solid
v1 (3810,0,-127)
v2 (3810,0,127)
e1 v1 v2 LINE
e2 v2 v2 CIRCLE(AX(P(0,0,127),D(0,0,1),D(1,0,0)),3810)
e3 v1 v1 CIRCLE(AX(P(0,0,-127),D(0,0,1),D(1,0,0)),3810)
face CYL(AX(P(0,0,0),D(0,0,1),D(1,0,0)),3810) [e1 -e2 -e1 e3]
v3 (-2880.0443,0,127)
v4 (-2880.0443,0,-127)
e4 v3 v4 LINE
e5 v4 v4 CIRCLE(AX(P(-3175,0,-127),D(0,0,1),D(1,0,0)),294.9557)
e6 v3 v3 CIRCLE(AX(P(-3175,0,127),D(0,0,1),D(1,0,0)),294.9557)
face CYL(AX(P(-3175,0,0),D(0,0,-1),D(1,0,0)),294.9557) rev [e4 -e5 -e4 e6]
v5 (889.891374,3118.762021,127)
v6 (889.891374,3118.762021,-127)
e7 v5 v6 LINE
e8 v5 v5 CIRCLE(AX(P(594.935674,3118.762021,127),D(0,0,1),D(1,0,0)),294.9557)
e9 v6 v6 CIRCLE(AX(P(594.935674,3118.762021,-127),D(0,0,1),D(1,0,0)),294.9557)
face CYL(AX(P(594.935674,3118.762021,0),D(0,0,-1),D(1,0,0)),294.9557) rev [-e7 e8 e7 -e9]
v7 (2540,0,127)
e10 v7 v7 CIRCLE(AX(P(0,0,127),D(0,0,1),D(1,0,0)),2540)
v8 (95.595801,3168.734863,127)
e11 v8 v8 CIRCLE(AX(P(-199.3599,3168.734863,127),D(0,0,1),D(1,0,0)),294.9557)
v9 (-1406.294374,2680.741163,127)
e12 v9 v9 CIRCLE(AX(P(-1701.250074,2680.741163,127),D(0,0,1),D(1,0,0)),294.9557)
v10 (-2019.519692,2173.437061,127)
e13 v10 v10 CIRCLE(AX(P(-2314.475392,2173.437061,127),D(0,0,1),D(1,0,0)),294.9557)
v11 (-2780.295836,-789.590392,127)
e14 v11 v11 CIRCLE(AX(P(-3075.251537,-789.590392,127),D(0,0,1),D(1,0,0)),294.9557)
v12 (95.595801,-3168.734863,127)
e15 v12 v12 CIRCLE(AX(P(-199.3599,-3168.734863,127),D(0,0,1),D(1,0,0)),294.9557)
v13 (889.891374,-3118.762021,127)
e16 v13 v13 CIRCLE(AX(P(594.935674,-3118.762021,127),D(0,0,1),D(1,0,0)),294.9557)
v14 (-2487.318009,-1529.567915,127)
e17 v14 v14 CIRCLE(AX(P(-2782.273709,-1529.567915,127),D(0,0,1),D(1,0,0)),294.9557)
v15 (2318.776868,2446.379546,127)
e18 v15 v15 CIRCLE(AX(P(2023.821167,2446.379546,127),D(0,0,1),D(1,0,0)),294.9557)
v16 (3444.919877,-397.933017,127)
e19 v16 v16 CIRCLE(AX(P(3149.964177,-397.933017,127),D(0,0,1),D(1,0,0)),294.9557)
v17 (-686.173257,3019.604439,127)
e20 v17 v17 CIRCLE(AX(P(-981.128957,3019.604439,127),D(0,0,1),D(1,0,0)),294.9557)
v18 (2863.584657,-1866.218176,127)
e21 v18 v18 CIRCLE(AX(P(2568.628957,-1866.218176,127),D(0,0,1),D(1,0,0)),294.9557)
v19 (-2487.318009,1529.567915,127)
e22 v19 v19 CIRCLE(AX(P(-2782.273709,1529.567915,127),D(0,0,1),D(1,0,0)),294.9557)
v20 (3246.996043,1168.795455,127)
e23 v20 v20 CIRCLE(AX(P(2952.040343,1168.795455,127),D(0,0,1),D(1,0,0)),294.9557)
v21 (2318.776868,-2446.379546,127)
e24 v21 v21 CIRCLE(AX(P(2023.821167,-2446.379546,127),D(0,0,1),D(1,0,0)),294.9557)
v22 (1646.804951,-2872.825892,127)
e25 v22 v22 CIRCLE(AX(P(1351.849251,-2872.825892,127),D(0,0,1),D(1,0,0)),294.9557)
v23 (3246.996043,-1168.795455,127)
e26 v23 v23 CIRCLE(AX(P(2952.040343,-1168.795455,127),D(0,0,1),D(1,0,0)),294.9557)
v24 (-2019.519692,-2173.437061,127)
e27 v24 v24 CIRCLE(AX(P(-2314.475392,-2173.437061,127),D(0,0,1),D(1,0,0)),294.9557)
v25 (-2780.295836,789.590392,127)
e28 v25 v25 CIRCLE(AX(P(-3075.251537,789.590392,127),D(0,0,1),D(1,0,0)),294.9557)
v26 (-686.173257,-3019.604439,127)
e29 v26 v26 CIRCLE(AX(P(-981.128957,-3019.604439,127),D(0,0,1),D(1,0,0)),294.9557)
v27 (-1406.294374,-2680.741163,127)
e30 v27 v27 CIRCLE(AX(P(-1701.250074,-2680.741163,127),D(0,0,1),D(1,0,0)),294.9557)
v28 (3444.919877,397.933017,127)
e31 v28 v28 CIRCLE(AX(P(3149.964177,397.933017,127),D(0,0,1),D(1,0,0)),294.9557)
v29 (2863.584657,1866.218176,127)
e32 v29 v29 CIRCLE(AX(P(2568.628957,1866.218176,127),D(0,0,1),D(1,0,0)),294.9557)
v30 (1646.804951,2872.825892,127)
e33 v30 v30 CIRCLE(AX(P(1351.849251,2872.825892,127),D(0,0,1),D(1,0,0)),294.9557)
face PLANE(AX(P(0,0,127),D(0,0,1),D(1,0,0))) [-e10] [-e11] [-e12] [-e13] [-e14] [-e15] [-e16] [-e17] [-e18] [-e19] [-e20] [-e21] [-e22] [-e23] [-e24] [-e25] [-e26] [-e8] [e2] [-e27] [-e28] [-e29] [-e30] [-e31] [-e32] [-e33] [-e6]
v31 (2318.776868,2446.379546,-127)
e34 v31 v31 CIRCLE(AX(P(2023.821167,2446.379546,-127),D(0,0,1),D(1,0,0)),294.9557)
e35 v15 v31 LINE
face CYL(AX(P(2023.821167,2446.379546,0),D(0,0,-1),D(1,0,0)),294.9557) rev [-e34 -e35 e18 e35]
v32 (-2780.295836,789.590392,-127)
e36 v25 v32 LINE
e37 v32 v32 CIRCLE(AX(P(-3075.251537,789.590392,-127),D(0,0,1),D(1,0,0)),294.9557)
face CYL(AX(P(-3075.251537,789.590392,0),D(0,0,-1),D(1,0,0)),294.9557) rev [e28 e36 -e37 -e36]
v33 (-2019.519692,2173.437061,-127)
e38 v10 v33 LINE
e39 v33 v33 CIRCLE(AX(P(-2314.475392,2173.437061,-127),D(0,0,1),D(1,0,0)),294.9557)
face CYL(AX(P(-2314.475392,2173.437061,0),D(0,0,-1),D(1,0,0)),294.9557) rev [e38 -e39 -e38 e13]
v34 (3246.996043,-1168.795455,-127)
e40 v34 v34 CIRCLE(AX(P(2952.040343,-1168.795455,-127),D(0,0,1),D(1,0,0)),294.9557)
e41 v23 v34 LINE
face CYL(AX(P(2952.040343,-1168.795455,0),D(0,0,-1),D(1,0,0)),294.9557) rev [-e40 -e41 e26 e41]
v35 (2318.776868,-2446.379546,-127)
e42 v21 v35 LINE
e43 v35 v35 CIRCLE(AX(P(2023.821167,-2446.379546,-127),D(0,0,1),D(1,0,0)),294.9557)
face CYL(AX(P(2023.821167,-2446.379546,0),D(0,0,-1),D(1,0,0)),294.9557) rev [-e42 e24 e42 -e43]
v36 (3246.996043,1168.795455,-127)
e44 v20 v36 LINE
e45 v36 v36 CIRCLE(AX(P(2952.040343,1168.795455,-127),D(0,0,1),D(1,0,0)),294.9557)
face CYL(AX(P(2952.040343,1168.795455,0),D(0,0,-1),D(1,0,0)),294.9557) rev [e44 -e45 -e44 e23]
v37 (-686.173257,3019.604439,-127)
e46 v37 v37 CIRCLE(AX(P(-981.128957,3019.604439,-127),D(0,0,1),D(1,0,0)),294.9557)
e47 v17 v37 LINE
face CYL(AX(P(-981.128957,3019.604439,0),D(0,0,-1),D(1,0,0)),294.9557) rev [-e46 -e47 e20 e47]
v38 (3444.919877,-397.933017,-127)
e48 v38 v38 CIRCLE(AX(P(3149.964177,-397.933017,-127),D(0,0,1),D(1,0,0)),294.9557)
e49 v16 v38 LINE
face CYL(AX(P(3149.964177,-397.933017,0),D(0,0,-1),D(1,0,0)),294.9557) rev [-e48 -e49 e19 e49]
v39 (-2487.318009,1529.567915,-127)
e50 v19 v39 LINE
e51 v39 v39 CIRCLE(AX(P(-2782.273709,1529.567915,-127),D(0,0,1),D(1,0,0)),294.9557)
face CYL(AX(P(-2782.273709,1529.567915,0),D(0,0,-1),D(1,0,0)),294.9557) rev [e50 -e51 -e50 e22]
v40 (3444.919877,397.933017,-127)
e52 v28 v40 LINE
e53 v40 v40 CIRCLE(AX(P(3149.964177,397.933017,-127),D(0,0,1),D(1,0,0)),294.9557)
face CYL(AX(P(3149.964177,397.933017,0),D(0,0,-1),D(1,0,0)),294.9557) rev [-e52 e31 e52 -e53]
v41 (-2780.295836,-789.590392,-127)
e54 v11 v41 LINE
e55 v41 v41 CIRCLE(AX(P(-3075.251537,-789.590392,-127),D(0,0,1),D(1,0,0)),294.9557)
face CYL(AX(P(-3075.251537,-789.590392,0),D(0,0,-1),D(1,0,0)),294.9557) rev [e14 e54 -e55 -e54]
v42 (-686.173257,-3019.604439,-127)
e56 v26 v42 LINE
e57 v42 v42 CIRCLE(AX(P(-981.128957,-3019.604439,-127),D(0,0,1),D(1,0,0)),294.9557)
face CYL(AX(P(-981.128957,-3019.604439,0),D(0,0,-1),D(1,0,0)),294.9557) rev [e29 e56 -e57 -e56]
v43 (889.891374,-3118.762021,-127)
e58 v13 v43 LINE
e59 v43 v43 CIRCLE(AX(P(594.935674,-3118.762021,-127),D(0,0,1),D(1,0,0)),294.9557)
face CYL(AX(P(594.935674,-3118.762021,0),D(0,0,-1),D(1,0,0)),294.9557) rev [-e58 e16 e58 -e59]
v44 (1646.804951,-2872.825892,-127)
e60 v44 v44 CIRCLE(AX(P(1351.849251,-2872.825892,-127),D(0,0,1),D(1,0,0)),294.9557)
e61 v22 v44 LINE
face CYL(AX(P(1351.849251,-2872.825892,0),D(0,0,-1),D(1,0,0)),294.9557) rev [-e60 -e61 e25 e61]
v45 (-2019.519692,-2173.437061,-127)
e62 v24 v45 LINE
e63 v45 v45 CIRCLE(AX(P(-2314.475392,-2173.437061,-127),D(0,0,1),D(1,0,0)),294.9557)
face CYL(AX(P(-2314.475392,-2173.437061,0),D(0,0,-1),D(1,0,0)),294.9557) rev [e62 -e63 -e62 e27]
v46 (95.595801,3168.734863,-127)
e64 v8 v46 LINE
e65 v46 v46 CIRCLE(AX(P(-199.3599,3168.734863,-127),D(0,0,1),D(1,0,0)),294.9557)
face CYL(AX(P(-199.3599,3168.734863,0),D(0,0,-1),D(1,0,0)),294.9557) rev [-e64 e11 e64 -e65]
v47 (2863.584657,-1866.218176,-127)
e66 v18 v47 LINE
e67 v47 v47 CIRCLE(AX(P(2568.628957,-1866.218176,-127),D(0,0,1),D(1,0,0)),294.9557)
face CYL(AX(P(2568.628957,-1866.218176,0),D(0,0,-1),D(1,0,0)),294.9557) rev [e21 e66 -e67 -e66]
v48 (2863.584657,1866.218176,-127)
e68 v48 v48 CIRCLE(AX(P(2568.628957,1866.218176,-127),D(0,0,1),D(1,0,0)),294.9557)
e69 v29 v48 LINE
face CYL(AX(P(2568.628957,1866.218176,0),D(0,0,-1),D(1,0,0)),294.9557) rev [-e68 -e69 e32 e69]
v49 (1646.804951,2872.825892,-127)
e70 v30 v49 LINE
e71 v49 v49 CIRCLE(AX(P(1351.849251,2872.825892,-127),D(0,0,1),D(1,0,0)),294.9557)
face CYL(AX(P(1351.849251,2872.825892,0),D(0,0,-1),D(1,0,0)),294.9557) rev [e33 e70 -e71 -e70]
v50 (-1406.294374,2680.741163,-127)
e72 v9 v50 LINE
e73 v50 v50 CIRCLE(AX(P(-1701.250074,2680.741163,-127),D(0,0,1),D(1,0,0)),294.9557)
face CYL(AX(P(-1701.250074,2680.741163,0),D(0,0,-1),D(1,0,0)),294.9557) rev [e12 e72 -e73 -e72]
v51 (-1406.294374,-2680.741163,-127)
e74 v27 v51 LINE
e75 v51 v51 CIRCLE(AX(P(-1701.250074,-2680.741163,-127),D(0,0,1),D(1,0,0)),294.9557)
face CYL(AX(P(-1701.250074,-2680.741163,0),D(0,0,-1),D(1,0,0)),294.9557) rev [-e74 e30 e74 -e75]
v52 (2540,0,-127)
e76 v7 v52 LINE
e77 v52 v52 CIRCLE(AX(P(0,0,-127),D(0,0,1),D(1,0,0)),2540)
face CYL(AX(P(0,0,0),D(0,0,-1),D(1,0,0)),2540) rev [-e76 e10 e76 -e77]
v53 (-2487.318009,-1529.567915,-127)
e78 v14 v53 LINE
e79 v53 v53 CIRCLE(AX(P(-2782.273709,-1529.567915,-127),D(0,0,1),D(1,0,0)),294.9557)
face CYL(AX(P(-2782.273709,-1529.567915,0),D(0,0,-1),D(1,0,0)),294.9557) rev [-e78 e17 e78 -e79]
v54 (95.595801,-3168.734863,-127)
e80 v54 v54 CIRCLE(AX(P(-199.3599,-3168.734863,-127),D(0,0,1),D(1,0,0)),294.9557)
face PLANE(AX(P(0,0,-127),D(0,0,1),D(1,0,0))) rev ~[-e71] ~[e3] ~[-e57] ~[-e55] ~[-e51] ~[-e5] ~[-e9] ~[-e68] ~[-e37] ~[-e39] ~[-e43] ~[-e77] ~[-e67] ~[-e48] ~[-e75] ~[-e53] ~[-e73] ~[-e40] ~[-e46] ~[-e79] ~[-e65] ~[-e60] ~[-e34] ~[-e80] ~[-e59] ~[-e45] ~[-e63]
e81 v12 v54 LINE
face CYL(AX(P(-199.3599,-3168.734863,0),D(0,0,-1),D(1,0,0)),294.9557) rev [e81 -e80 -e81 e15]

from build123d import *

# Parameters (mm, degrees)
F0_R     = 3810
F0_R_2   = 294.9557001393
F0_R_3   = 2540
F1_DEPTH = 127


# Not quite as in the source:
# - a feature names something its author has since deleted; it is built from what else it names


with BuildPart() as f1:
    # F0 (on Top) → F1 (new body, symmetric)
    with BuildSketch(Plane.XY):
        Circle(F0_R)
        with Locations((-2314.475392063, -2173.4370613236)):
            Circle(F0_R_2, mode=Mode.SUBTRACT)
        with Locations((-981.1289571405, -3019.6044392371)):
            Circle(F0_R_2, mode=Mode.SUBTRACT)
        with Locations((-199.3598995056, -3168.7348627598)):
            Circle(F0_R_2, mode=Mode.SUBTRACT)
        with Locations((-1701.2500740583, -2680.7411634689)):
            Circle(F0_R_2, mode=Mode.SUBTRACT)
        with Locations((-2782.2737091393, -1529.5679152729)):
            Circle(F0_R_2, mode=Mode.SUBTRACT)
        with Locations((-3075.2515365834, -789.5903917484)):
            Circle(F0_R_2, mode=Mode.SUBTRACT)
        with Locations((594.9356738097, -3118.7620210636)):
            Circle(F0_R_2, mode=Mode.SUBTRACT)
        with Locations((1351.8492507191, -2872.8258915796)):
            Circle(F0_R_2, mode=Mode.SUBTRACT)
        with Locations((2023.8211674521, -2446.3795458131)):
            Circle(F0_R_2, mode=Mode.SUBTRACT)
        with Locations((2568.6289571405, -1866.2181760286)):
            Circle(F0_R_2, mode=Mode.SUBTRACT)
        with Locations((2952.0403426952, -1168.7954547739)):
            Circle(F0_R_2, mode=Mode.SUBTRACT)
        with Locations((3149.9641766735, -397.9330165667)):
            Circle(F0_R_2, mode=Mode.SUBTRACT)
        with Locations((-3175, 0)):
            Circle(F0_R_2, mode=Mode.SUBTRACT)
        with Locations((-3075.2515365834, 789.5903917484)):
            Circle(F0_R_2, mode=Mode.SUBTRACT)
        with Locations((-2782.2737091393, 1529.5679152729)):
            Circle(F0_R_2, mode=Mode.SUBTRACT)
        with Locations((-2314.475392063, 2173.4370613236)):
            Circle(F0_R_2, mode=Mode.SUBTRACT)
        with Locations((-1701.2500740583, 2680.7411634689)):
            Circle(F0_R_2, mode=Mode.SUBTRACT)
        with Locations((-981.1289571405, 3019.6044392371)):
            Circle(F0_R_2, mode=Mode.SUBTRACT)
        with Locations((-199.3598995056, 3168.7348627598)):
            Circle(F0_R_2, mode=Mode.SUBTRACT)
        Circle(F0_R_3, mode=Mode.SUBTRACT)
        with Locations((3149.9641766735, 397.9330165667)):
            Circle(F0_R_2, mode=Mode.SUBTRACT)
        with Locations((2568.6289571405, 1866.2181760286)):
            Circle(F0_R_2, mode=Mode.SUBTRACT)
        with Locations((2952.0403426952, 1168.7954547739)):
            Circle(F0_R_2, mode=Mode.SUBTRACT)
        with Locations((594.9356738097, 3118.7620210636)):
            Circle(F0_R_2, mode=Mode.SUBTRACT)
        with Locations((1351.8492507191, 2872.8258915796)):
            Circle(F0_R_2, mode=Mode.SUBTRACT)
        with Locations((2023.8211674521, 2446.3795458131)):
            Circle(F0_R_2, mode=Mode.SUBTRACT)
    extrude(amount=F1_DEPTH, both=True)


solid = f1.part
